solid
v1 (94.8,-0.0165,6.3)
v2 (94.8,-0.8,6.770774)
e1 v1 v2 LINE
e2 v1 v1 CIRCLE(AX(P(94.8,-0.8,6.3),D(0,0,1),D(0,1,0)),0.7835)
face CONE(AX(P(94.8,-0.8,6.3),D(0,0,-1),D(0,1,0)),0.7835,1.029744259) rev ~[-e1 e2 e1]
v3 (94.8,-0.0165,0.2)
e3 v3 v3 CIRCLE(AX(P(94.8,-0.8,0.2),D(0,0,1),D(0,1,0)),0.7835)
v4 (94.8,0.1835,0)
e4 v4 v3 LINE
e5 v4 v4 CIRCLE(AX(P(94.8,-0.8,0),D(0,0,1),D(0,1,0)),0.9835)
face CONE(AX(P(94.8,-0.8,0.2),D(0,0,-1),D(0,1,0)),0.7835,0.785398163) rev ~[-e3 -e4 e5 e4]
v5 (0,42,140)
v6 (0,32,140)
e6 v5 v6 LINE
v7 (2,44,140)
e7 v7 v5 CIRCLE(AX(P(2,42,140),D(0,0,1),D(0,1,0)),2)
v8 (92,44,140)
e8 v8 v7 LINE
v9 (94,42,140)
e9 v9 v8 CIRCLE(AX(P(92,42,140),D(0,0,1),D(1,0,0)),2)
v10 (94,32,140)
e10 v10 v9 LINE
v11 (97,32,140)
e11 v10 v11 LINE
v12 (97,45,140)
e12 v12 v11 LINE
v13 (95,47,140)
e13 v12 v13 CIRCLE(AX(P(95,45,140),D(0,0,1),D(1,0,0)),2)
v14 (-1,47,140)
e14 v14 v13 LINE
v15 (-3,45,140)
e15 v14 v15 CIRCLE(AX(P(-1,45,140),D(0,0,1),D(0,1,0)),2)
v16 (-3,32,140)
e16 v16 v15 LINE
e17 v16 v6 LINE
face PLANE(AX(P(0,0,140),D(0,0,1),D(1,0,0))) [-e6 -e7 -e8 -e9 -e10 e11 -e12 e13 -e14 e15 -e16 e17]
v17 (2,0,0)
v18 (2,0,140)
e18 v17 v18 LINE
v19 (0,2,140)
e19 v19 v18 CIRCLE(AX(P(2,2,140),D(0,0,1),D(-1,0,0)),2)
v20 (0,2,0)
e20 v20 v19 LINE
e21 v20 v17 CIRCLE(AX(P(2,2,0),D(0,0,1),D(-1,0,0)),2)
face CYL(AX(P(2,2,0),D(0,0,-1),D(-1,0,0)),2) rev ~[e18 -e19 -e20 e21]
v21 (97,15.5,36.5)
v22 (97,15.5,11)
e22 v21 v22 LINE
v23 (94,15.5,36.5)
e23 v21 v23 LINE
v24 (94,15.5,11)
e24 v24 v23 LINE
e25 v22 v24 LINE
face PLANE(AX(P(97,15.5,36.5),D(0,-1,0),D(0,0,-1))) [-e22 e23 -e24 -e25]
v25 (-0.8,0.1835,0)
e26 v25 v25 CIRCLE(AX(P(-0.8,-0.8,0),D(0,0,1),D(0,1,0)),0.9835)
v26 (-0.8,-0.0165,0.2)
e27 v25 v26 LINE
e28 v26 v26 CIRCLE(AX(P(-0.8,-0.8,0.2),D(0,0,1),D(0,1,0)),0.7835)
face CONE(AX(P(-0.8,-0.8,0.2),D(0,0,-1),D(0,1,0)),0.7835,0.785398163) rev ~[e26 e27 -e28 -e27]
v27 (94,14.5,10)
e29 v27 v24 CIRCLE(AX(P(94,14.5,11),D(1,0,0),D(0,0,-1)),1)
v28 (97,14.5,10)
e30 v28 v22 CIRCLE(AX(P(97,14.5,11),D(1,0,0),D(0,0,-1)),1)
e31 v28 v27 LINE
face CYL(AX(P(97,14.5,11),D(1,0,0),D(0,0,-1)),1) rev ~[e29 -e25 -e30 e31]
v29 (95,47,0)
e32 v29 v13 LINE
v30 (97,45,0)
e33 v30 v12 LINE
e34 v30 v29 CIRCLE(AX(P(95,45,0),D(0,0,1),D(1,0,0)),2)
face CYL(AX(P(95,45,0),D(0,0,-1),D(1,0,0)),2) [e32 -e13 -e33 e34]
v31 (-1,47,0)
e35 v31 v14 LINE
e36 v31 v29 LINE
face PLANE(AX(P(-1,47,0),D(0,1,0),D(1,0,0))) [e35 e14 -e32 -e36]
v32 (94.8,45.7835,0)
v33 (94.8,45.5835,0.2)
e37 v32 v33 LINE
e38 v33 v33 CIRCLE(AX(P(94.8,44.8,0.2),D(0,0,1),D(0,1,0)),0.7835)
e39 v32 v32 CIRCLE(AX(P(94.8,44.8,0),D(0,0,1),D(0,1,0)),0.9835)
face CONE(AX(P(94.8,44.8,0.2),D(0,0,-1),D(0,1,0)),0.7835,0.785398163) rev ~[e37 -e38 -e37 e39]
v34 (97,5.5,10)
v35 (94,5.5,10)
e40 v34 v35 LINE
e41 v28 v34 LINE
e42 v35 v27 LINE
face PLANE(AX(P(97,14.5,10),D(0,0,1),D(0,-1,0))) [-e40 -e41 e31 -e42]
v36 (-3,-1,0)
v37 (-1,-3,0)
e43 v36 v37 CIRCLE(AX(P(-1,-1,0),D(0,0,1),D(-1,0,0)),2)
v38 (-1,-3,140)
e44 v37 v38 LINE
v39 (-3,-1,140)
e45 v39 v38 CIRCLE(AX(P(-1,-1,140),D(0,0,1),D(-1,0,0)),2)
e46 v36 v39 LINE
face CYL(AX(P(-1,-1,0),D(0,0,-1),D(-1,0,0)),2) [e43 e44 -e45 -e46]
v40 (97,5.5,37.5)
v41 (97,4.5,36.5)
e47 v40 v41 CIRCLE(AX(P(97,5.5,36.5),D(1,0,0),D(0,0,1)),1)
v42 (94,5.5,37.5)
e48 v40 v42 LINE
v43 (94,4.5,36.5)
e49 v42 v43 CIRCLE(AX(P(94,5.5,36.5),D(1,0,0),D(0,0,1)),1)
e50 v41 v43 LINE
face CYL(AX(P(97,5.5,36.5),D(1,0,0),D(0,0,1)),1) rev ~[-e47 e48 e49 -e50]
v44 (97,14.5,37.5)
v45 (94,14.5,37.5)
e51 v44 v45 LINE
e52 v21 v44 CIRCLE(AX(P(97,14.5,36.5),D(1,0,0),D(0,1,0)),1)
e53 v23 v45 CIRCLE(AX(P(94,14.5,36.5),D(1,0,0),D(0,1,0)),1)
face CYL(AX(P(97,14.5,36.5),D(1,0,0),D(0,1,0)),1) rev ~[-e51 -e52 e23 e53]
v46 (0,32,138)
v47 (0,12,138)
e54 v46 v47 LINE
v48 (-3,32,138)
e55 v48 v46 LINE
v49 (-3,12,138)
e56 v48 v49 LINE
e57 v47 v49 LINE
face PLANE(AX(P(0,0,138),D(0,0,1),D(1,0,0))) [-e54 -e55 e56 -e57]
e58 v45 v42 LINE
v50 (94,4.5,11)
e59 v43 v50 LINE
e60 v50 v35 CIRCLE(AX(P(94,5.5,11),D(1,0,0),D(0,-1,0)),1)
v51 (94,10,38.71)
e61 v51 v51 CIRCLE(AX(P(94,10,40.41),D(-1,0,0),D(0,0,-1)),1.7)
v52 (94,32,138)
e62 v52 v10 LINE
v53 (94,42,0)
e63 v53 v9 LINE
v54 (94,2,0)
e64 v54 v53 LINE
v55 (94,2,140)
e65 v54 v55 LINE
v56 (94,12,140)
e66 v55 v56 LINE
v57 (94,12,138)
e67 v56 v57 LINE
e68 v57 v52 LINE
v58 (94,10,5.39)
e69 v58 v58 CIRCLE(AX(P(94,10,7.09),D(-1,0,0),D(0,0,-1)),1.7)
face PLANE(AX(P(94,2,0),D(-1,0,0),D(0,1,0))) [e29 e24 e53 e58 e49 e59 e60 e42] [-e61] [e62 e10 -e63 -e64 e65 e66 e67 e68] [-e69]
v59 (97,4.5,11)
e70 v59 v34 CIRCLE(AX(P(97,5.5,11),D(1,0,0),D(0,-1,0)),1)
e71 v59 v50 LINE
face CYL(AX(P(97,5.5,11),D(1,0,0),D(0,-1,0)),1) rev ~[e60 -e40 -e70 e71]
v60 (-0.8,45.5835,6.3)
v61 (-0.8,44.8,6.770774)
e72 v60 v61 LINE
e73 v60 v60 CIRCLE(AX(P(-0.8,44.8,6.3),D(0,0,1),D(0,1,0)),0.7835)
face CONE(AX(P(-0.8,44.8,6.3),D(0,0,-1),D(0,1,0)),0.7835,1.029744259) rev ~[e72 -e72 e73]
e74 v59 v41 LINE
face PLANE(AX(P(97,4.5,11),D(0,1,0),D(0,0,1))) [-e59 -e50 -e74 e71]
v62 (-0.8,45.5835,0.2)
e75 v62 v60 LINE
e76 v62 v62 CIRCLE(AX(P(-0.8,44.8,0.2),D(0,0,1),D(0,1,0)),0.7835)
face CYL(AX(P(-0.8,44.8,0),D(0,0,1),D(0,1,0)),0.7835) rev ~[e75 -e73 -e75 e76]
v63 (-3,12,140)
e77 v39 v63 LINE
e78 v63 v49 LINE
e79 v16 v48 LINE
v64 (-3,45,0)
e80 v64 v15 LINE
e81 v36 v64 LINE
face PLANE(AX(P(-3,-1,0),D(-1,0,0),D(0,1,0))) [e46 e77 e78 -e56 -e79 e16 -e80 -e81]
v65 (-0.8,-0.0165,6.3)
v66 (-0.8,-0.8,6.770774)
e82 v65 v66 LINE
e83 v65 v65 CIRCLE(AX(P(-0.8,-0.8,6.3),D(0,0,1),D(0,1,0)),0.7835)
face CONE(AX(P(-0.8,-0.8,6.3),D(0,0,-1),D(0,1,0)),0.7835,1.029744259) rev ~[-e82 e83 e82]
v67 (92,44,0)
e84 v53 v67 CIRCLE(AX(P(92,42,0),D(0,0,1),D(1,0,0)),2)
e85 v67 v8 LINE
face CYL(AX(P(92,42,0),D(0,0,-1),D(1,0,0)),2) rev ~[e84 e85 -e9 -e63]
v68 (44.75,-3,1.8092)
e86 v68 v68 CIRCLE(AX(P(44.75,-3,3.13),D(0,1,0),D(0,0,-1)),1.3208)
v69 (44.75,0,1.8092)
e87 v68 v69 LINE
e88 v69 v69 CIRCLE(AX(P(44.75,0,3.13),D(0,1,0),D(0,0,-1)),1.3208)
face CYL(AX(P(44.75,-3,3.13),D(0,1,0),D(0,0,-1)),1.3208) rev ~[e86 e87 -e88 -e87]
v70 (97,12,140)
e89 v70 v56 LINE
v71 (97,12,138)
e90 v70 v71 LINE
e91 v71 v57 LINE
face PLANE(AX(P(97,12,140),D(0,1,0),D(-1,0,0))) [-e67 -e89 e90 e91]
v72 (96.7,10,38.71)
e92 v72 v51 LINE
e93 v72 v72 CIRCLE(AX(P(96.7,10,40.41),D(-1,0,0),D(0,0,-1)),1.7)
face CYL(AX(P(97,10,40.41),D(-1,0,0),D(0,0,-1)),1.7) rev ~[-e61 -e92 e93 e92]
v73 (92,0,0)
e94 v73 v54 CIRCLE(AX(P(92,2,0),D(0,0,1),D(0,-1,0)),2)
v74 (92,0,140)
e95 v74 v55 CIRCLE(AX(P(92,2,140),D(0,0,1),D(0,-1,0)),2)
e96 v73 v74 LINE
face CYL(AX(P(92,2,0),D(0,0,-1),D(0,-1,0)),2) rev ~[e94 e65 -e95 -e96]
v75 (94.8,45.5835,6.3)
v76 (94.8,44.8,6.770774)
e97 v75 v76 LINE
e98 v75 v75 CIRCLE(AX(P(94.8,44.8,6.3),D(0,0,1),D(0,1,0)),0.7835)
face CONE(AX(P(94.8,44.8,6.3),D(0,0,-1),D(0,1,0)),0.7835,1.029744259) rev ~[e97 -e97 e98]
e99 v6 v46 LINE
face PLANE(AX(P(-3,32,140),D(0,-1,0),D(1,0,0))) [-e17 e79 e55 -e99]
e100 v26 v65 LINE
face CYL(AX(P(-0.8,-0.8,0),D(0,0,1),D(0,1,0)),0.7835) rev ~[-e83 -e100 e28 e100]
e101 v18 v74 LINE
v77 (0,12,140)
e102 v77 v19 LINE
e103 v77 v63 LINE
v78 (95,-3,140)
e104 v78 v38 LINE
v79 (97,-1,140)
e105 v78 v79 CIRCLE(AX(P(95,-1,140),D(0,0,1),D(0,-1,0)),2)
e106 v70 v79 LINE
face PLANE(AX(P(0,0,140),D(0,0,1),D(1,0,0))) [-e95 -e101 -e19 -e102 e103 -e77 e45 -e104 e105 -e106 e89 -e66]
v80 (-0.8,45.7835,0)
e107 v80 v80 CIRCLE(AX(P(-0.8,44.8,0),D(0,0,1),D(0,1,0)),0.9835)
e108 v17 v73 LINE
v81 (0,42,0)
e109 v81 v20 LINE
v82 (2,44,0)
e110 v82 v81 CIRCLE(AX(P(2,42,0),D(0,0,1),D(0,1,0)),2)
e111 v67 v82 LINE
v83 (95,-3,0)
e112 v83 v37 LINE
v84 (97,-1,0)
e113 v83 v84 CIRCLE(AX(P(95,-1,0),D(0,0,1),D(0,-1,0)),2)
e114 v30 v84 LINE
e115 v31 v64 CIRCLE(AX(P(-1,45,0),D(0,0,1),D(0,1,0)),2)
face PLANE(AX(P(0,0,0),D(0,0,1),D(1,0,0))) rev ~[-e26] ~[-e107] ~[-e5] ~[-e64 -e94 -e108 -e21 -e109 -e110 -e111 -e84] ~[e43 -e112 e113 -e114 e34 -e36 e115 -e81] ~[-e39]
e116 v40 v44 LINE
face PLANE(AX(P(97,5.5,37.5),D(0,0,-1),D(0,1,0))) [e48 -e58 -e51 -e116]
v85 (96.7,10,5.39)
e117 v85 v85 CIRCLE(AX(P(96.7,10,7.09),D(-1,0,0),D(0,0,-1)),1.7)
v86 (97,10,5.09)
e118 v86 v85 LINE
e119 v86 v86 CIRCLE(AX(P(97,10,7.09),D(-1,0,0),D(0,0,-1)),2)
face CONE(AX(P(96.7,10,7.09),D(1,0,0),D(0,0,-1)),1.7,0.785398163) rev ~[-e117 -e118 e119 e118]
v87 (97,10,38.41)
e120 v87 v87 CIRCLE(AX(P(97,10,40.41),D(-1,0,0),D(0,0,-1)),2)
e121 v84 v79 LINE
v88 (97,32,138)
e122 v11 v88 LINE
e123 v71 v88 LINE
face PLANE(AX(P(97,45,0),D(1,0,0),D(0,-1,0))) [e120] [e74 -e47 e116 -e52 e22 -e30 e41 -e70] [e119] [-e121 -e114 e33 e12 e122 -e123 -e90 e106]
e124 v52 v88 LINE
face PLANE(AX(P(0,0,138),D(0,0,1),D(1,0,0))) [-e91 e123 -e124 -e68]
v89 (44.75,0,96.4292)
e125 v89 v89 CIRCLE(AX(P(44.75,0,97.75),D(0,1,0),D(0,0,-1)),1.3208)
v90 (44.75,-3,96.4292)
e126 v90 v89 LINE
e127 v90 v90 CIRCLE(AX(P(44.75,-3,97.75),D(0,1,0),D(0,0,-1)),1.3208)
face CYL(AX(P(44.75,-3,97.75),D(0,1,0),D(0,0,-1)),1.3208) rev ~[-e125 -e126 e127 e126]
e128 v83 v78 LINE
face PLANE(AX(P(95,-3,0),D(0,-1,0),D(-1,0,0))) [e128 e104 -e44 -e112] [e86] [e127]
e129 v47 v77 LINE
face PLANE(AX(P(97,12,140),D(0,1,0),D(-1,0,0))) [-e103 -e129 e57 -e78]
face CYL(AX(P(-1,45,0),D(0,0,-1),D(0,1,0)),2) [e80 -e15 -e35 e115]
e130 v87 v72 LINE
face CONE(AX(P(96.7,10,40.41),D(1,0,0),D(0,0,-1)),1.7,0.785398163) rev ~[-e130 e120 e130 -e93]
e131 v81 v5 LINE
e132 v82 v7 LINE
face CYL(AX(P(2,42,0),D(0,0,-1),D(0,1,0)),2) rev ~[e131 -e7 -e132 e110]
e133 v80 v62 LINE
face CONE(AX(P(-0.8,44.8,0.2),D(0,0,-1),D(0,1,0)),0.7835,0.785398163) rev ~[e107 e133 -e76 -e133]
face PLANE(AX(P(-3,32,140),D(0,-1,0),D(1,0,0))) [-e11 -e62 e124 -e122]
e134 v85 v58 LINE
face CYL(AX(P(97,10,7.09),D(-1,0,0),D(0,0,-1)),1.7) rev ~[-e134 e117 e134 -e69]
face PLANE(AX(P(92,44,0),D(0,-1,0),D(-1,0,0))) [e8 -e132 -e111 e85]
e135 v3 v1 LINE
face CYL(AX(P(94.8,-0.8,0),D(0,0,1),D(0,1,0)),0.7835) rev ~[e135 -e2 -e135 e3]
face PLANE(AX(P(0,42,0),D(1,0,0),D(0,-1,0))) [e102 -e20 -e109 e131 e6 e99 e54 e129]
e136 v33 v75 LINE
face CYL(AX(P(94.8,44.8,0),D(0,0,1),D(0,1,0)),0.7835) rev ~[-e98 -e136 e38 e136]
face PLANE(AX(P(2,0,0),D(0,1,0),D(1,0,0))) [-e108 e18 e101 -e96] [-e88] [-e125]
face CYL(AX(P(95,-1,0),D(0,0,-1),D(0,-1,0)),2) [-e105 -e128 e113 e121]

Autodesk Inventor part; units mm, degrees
ref_plane "YZ Plane" through (0, 0, 0) normal (1, 0, 0) x (0, 1, 0)
ref_plane "XZ Plane" through (0, 0, 0) normal (0, 1, 0) x (-1, 0, 0)
ref_plane "XY Plane" through (0, 0, 0) normal (0, 0, 1) x (1, 0, 0)
sketch "Sketch1" plane through (0, 0, 0) normal (0, 0, 1) x (1, 0, 0)
  line L0 (2, 0) -> (92, 0)
  line L1 (94, 2) -> (94, 42)
  line L2 (92, 44) -> (2, 44)
  line L3 (0, 42) -> (0, 2)
  line L4 (-1, 47) -> (95, 47)
  line L5 (97, 45) -> (97, -1)
  line L6 (95, -3) -> (-1, -3)
  line L7 (-3, -1) -> (-3, 45)
  arc A0 (2, 44) -> (0, 42) centre (2, 42) ccw
  arc A1 (0, 2) -> (2, 0) centre (2, 2) ccw
  arc A2 (92, 0) -> (94, 2) centre (92, 2) ccw
  arc A3 (94, 42) -> (92, 44) centre (92, 42) ccw
  arc A4 (-3, -1) -> (-1, -3) centre (-1, -1) ccw
  arc A5 (-1, 47) -> (-3, 45) centre (-1, 45) ccw
  arc A6 (97, 45) -> (95, 47) centre (95, 45) ccw
  arc A7 (95, -3) -> (97, -1) centre (95, -1) ccw
  point P0 (0, 0)
  point P1 (94, 44)
  point P2 (94, 0)
  point P3 (0, 44)
  point P4 (97, -3)
  point P5 (97, 47)
  point P6 (-3, -3)
  dimension "d0" = 94
  dimension "d1" = 44
  dimension "d2" = 100
  dimension "d3" = 50
  dimension "d4" = 3
  dimension "d5" = 3
  dimension "d6" = 2
  dimension "d9" = 2
extrude "Extrusion1" add sketch "Sketch1" along normal blind 140
sketch "Sketch2" plane through (0, 0, 140) normal (0, 0, 1) x (1, 0, 0)
  line L0 (-3, 45) -> (-3, -1) projected
  line L1 (97, -1) -> (97, 45) projected
  line L2 (-3, 32) -> (97, 32)
  line L3 (97, 32) -> (97, 12)
  line L4 (97, 12) -> (-3, 12)
  line L5 (-3, 12) -> (-3, 32)
  line L6 (-1, -3) -> (95, -3) projected
  line L7 (95, 47) -> (-1, 47) projected
  point P0 (0, 0)
  point P1 (-3, 12)
  dimension "d10" = 20
  dimension "d11" = 15
  dimension "d12" = 50
extrude "Extrusion2" cut sketch "Sketch2" against normal blind 2
sketch "Sketch3" plane through (97, -1, 0) normal (1, 0, 0) x (0, 0, -1)
  line L0 (-11, 5.5) -> (-36.5, 5.5)
  line L1 (-37.5, 6.5) -> (-37.5, 15.5)
  line L2 (-36.5, 16.5) -> (-11, 16.5)
  line L3 (-10, 15.5) -> (-10, 6.5)
  line L4 (0, -2) -> (-140, -2) projected
  line L5 (0, 48) -> (-140, 48) projected
  line L6 (0, 0) -> (0, 46) projected
  arc A0 (-11, 5.5) -> (-10, 6.5) centre (-11, 6.5) ccw
  arc A1 (-10, 15.5) -> (-11, 16.5) centre (-11, 15.5) ccw
  arc A2 (-37.5, 6.5) -> (-36.5, 5.5) centre (-36.5, 6.5) ccw
  arc A3 (-36.5, 16.5) -> (-37.5, 15.5) centre (-36.5, 15.5) ccw
  circle A4 centre (-7.09, 11) radius 1.5
  circle A5 centre (-40.41, 11) radius 1.5
  line L7 (-23.75, 5.5) -> (-23.75, 19.7829) construction
  point P0 (0, 1)
  point P1 (-37.5, 16.5)
  point P2 (-37.5, 5.5)
  point P3 (-10, 16.5)
  dimension "d15" = 27.5
  dimension "d16" = 11
  dimension "d17" = 50
  dimension "d18" = 31.5
  dimension "d19" = 10
  dimension "d20" = 1
  dimension "d21" = 3
  dimension "d22" = 3
  dimension "d23" = 16.66
  dimension "d24" = 16.66
extrude "Extrusion3" cut sketch "Sketch3" against normal blind 10 contours L0 A2 L1 A3 L2 A1 L3 A0
hole "Hole1" at (97, 10, 7.09) at (97, 10, 40.41) direction (-1, 0, 0) diameter 3.4 depth 8.8 tip angle 118 clearance for "Countersunk Flat Head Screw ISO 2009/7046" size "M3" standard "ISO"
chamfer "Chamfer1" distance 0.3 angle 45 2 edges at (97, 10, 8.79) (97, 10, 42.11)
sketch "Sketch5" plane through (-1, -3, 0) normal (0, -1, 0) x (1, 0, 0)
  circle A0 centre (45.75, 3.13) radius 1.5
  circle A1 centre (45.75, 97.75) radius 1.5
  line L0 (98, 0) -> (98, 140) projected
  line L1 (0, 0) -> (96, 0) projected
  point P0 (1, 0)
  dimension "d49" = 3
  dimension "d50" = 3
  dimension "d51" = 94.62
  dimension "d52" = 52.25
  dimension "d53" = 3.13
hole "Hole3" at (44.75, -3, 3.13) at (44.75, -3, 97.75) direction (0, 1, 0) diameter 2.6416 depth 10.979 tip angle 118 thread size "6-32 UNC" class "2B" standard "ANSI Unified Screw Threads"
sketch "Sketch6" plane through (0, 0, 0) normal (0, 0, -1) x (-1, 0, 0)
  circle A0 centre (0.8, -0.8) radius 1
  line L0 (1, -3) -> (-95, -3) construction
  line L1 (-47, -3) -> (-47, -11.0585) construction
  line L2 (3, 45) -> (3, -1) construction
  line L3 (3, 22) -> (17.9543, 22) construction
  circle A1 centre (0.8, 44.8) radius 1
  line L4 (-47, 47) -> (-47, 55.0585) construction
  circle A2 centre (-94.8, -0.8) radius 1
  circle A3 centre (-94.8, 44.8) radius 1
  point P0 (0, 0)
  point P1 (-94, 0)
  point P2 (-97, 45)
  point P3 (-97, -1)
  dimension "d61" = 2
  dimension "d62" = 2.2
  dimension "d63" = 2.2
hole "Hole4" at (-0.8, -0.8, 0) at (-0.8, 44.8, 0) at (94.8, 44.8, 0) at (94.8, -0.8, 0) direction (0, 0, 1) diameter 1.567 depth 6.3 tip angle 118 thread size "M2x0.4" class "6H" standard "ISO Metric profile"
chamfer "Chamfer2" distance 0.2 angle 45 4 edges at (-0.8, -1.5835, 0) (-0.8, 44.0165, 0) (94.8, 44.0165, 0) (94.8, -1.5835, 0)
equation "\"d24\" = d23"
properties part number "obudowa"
